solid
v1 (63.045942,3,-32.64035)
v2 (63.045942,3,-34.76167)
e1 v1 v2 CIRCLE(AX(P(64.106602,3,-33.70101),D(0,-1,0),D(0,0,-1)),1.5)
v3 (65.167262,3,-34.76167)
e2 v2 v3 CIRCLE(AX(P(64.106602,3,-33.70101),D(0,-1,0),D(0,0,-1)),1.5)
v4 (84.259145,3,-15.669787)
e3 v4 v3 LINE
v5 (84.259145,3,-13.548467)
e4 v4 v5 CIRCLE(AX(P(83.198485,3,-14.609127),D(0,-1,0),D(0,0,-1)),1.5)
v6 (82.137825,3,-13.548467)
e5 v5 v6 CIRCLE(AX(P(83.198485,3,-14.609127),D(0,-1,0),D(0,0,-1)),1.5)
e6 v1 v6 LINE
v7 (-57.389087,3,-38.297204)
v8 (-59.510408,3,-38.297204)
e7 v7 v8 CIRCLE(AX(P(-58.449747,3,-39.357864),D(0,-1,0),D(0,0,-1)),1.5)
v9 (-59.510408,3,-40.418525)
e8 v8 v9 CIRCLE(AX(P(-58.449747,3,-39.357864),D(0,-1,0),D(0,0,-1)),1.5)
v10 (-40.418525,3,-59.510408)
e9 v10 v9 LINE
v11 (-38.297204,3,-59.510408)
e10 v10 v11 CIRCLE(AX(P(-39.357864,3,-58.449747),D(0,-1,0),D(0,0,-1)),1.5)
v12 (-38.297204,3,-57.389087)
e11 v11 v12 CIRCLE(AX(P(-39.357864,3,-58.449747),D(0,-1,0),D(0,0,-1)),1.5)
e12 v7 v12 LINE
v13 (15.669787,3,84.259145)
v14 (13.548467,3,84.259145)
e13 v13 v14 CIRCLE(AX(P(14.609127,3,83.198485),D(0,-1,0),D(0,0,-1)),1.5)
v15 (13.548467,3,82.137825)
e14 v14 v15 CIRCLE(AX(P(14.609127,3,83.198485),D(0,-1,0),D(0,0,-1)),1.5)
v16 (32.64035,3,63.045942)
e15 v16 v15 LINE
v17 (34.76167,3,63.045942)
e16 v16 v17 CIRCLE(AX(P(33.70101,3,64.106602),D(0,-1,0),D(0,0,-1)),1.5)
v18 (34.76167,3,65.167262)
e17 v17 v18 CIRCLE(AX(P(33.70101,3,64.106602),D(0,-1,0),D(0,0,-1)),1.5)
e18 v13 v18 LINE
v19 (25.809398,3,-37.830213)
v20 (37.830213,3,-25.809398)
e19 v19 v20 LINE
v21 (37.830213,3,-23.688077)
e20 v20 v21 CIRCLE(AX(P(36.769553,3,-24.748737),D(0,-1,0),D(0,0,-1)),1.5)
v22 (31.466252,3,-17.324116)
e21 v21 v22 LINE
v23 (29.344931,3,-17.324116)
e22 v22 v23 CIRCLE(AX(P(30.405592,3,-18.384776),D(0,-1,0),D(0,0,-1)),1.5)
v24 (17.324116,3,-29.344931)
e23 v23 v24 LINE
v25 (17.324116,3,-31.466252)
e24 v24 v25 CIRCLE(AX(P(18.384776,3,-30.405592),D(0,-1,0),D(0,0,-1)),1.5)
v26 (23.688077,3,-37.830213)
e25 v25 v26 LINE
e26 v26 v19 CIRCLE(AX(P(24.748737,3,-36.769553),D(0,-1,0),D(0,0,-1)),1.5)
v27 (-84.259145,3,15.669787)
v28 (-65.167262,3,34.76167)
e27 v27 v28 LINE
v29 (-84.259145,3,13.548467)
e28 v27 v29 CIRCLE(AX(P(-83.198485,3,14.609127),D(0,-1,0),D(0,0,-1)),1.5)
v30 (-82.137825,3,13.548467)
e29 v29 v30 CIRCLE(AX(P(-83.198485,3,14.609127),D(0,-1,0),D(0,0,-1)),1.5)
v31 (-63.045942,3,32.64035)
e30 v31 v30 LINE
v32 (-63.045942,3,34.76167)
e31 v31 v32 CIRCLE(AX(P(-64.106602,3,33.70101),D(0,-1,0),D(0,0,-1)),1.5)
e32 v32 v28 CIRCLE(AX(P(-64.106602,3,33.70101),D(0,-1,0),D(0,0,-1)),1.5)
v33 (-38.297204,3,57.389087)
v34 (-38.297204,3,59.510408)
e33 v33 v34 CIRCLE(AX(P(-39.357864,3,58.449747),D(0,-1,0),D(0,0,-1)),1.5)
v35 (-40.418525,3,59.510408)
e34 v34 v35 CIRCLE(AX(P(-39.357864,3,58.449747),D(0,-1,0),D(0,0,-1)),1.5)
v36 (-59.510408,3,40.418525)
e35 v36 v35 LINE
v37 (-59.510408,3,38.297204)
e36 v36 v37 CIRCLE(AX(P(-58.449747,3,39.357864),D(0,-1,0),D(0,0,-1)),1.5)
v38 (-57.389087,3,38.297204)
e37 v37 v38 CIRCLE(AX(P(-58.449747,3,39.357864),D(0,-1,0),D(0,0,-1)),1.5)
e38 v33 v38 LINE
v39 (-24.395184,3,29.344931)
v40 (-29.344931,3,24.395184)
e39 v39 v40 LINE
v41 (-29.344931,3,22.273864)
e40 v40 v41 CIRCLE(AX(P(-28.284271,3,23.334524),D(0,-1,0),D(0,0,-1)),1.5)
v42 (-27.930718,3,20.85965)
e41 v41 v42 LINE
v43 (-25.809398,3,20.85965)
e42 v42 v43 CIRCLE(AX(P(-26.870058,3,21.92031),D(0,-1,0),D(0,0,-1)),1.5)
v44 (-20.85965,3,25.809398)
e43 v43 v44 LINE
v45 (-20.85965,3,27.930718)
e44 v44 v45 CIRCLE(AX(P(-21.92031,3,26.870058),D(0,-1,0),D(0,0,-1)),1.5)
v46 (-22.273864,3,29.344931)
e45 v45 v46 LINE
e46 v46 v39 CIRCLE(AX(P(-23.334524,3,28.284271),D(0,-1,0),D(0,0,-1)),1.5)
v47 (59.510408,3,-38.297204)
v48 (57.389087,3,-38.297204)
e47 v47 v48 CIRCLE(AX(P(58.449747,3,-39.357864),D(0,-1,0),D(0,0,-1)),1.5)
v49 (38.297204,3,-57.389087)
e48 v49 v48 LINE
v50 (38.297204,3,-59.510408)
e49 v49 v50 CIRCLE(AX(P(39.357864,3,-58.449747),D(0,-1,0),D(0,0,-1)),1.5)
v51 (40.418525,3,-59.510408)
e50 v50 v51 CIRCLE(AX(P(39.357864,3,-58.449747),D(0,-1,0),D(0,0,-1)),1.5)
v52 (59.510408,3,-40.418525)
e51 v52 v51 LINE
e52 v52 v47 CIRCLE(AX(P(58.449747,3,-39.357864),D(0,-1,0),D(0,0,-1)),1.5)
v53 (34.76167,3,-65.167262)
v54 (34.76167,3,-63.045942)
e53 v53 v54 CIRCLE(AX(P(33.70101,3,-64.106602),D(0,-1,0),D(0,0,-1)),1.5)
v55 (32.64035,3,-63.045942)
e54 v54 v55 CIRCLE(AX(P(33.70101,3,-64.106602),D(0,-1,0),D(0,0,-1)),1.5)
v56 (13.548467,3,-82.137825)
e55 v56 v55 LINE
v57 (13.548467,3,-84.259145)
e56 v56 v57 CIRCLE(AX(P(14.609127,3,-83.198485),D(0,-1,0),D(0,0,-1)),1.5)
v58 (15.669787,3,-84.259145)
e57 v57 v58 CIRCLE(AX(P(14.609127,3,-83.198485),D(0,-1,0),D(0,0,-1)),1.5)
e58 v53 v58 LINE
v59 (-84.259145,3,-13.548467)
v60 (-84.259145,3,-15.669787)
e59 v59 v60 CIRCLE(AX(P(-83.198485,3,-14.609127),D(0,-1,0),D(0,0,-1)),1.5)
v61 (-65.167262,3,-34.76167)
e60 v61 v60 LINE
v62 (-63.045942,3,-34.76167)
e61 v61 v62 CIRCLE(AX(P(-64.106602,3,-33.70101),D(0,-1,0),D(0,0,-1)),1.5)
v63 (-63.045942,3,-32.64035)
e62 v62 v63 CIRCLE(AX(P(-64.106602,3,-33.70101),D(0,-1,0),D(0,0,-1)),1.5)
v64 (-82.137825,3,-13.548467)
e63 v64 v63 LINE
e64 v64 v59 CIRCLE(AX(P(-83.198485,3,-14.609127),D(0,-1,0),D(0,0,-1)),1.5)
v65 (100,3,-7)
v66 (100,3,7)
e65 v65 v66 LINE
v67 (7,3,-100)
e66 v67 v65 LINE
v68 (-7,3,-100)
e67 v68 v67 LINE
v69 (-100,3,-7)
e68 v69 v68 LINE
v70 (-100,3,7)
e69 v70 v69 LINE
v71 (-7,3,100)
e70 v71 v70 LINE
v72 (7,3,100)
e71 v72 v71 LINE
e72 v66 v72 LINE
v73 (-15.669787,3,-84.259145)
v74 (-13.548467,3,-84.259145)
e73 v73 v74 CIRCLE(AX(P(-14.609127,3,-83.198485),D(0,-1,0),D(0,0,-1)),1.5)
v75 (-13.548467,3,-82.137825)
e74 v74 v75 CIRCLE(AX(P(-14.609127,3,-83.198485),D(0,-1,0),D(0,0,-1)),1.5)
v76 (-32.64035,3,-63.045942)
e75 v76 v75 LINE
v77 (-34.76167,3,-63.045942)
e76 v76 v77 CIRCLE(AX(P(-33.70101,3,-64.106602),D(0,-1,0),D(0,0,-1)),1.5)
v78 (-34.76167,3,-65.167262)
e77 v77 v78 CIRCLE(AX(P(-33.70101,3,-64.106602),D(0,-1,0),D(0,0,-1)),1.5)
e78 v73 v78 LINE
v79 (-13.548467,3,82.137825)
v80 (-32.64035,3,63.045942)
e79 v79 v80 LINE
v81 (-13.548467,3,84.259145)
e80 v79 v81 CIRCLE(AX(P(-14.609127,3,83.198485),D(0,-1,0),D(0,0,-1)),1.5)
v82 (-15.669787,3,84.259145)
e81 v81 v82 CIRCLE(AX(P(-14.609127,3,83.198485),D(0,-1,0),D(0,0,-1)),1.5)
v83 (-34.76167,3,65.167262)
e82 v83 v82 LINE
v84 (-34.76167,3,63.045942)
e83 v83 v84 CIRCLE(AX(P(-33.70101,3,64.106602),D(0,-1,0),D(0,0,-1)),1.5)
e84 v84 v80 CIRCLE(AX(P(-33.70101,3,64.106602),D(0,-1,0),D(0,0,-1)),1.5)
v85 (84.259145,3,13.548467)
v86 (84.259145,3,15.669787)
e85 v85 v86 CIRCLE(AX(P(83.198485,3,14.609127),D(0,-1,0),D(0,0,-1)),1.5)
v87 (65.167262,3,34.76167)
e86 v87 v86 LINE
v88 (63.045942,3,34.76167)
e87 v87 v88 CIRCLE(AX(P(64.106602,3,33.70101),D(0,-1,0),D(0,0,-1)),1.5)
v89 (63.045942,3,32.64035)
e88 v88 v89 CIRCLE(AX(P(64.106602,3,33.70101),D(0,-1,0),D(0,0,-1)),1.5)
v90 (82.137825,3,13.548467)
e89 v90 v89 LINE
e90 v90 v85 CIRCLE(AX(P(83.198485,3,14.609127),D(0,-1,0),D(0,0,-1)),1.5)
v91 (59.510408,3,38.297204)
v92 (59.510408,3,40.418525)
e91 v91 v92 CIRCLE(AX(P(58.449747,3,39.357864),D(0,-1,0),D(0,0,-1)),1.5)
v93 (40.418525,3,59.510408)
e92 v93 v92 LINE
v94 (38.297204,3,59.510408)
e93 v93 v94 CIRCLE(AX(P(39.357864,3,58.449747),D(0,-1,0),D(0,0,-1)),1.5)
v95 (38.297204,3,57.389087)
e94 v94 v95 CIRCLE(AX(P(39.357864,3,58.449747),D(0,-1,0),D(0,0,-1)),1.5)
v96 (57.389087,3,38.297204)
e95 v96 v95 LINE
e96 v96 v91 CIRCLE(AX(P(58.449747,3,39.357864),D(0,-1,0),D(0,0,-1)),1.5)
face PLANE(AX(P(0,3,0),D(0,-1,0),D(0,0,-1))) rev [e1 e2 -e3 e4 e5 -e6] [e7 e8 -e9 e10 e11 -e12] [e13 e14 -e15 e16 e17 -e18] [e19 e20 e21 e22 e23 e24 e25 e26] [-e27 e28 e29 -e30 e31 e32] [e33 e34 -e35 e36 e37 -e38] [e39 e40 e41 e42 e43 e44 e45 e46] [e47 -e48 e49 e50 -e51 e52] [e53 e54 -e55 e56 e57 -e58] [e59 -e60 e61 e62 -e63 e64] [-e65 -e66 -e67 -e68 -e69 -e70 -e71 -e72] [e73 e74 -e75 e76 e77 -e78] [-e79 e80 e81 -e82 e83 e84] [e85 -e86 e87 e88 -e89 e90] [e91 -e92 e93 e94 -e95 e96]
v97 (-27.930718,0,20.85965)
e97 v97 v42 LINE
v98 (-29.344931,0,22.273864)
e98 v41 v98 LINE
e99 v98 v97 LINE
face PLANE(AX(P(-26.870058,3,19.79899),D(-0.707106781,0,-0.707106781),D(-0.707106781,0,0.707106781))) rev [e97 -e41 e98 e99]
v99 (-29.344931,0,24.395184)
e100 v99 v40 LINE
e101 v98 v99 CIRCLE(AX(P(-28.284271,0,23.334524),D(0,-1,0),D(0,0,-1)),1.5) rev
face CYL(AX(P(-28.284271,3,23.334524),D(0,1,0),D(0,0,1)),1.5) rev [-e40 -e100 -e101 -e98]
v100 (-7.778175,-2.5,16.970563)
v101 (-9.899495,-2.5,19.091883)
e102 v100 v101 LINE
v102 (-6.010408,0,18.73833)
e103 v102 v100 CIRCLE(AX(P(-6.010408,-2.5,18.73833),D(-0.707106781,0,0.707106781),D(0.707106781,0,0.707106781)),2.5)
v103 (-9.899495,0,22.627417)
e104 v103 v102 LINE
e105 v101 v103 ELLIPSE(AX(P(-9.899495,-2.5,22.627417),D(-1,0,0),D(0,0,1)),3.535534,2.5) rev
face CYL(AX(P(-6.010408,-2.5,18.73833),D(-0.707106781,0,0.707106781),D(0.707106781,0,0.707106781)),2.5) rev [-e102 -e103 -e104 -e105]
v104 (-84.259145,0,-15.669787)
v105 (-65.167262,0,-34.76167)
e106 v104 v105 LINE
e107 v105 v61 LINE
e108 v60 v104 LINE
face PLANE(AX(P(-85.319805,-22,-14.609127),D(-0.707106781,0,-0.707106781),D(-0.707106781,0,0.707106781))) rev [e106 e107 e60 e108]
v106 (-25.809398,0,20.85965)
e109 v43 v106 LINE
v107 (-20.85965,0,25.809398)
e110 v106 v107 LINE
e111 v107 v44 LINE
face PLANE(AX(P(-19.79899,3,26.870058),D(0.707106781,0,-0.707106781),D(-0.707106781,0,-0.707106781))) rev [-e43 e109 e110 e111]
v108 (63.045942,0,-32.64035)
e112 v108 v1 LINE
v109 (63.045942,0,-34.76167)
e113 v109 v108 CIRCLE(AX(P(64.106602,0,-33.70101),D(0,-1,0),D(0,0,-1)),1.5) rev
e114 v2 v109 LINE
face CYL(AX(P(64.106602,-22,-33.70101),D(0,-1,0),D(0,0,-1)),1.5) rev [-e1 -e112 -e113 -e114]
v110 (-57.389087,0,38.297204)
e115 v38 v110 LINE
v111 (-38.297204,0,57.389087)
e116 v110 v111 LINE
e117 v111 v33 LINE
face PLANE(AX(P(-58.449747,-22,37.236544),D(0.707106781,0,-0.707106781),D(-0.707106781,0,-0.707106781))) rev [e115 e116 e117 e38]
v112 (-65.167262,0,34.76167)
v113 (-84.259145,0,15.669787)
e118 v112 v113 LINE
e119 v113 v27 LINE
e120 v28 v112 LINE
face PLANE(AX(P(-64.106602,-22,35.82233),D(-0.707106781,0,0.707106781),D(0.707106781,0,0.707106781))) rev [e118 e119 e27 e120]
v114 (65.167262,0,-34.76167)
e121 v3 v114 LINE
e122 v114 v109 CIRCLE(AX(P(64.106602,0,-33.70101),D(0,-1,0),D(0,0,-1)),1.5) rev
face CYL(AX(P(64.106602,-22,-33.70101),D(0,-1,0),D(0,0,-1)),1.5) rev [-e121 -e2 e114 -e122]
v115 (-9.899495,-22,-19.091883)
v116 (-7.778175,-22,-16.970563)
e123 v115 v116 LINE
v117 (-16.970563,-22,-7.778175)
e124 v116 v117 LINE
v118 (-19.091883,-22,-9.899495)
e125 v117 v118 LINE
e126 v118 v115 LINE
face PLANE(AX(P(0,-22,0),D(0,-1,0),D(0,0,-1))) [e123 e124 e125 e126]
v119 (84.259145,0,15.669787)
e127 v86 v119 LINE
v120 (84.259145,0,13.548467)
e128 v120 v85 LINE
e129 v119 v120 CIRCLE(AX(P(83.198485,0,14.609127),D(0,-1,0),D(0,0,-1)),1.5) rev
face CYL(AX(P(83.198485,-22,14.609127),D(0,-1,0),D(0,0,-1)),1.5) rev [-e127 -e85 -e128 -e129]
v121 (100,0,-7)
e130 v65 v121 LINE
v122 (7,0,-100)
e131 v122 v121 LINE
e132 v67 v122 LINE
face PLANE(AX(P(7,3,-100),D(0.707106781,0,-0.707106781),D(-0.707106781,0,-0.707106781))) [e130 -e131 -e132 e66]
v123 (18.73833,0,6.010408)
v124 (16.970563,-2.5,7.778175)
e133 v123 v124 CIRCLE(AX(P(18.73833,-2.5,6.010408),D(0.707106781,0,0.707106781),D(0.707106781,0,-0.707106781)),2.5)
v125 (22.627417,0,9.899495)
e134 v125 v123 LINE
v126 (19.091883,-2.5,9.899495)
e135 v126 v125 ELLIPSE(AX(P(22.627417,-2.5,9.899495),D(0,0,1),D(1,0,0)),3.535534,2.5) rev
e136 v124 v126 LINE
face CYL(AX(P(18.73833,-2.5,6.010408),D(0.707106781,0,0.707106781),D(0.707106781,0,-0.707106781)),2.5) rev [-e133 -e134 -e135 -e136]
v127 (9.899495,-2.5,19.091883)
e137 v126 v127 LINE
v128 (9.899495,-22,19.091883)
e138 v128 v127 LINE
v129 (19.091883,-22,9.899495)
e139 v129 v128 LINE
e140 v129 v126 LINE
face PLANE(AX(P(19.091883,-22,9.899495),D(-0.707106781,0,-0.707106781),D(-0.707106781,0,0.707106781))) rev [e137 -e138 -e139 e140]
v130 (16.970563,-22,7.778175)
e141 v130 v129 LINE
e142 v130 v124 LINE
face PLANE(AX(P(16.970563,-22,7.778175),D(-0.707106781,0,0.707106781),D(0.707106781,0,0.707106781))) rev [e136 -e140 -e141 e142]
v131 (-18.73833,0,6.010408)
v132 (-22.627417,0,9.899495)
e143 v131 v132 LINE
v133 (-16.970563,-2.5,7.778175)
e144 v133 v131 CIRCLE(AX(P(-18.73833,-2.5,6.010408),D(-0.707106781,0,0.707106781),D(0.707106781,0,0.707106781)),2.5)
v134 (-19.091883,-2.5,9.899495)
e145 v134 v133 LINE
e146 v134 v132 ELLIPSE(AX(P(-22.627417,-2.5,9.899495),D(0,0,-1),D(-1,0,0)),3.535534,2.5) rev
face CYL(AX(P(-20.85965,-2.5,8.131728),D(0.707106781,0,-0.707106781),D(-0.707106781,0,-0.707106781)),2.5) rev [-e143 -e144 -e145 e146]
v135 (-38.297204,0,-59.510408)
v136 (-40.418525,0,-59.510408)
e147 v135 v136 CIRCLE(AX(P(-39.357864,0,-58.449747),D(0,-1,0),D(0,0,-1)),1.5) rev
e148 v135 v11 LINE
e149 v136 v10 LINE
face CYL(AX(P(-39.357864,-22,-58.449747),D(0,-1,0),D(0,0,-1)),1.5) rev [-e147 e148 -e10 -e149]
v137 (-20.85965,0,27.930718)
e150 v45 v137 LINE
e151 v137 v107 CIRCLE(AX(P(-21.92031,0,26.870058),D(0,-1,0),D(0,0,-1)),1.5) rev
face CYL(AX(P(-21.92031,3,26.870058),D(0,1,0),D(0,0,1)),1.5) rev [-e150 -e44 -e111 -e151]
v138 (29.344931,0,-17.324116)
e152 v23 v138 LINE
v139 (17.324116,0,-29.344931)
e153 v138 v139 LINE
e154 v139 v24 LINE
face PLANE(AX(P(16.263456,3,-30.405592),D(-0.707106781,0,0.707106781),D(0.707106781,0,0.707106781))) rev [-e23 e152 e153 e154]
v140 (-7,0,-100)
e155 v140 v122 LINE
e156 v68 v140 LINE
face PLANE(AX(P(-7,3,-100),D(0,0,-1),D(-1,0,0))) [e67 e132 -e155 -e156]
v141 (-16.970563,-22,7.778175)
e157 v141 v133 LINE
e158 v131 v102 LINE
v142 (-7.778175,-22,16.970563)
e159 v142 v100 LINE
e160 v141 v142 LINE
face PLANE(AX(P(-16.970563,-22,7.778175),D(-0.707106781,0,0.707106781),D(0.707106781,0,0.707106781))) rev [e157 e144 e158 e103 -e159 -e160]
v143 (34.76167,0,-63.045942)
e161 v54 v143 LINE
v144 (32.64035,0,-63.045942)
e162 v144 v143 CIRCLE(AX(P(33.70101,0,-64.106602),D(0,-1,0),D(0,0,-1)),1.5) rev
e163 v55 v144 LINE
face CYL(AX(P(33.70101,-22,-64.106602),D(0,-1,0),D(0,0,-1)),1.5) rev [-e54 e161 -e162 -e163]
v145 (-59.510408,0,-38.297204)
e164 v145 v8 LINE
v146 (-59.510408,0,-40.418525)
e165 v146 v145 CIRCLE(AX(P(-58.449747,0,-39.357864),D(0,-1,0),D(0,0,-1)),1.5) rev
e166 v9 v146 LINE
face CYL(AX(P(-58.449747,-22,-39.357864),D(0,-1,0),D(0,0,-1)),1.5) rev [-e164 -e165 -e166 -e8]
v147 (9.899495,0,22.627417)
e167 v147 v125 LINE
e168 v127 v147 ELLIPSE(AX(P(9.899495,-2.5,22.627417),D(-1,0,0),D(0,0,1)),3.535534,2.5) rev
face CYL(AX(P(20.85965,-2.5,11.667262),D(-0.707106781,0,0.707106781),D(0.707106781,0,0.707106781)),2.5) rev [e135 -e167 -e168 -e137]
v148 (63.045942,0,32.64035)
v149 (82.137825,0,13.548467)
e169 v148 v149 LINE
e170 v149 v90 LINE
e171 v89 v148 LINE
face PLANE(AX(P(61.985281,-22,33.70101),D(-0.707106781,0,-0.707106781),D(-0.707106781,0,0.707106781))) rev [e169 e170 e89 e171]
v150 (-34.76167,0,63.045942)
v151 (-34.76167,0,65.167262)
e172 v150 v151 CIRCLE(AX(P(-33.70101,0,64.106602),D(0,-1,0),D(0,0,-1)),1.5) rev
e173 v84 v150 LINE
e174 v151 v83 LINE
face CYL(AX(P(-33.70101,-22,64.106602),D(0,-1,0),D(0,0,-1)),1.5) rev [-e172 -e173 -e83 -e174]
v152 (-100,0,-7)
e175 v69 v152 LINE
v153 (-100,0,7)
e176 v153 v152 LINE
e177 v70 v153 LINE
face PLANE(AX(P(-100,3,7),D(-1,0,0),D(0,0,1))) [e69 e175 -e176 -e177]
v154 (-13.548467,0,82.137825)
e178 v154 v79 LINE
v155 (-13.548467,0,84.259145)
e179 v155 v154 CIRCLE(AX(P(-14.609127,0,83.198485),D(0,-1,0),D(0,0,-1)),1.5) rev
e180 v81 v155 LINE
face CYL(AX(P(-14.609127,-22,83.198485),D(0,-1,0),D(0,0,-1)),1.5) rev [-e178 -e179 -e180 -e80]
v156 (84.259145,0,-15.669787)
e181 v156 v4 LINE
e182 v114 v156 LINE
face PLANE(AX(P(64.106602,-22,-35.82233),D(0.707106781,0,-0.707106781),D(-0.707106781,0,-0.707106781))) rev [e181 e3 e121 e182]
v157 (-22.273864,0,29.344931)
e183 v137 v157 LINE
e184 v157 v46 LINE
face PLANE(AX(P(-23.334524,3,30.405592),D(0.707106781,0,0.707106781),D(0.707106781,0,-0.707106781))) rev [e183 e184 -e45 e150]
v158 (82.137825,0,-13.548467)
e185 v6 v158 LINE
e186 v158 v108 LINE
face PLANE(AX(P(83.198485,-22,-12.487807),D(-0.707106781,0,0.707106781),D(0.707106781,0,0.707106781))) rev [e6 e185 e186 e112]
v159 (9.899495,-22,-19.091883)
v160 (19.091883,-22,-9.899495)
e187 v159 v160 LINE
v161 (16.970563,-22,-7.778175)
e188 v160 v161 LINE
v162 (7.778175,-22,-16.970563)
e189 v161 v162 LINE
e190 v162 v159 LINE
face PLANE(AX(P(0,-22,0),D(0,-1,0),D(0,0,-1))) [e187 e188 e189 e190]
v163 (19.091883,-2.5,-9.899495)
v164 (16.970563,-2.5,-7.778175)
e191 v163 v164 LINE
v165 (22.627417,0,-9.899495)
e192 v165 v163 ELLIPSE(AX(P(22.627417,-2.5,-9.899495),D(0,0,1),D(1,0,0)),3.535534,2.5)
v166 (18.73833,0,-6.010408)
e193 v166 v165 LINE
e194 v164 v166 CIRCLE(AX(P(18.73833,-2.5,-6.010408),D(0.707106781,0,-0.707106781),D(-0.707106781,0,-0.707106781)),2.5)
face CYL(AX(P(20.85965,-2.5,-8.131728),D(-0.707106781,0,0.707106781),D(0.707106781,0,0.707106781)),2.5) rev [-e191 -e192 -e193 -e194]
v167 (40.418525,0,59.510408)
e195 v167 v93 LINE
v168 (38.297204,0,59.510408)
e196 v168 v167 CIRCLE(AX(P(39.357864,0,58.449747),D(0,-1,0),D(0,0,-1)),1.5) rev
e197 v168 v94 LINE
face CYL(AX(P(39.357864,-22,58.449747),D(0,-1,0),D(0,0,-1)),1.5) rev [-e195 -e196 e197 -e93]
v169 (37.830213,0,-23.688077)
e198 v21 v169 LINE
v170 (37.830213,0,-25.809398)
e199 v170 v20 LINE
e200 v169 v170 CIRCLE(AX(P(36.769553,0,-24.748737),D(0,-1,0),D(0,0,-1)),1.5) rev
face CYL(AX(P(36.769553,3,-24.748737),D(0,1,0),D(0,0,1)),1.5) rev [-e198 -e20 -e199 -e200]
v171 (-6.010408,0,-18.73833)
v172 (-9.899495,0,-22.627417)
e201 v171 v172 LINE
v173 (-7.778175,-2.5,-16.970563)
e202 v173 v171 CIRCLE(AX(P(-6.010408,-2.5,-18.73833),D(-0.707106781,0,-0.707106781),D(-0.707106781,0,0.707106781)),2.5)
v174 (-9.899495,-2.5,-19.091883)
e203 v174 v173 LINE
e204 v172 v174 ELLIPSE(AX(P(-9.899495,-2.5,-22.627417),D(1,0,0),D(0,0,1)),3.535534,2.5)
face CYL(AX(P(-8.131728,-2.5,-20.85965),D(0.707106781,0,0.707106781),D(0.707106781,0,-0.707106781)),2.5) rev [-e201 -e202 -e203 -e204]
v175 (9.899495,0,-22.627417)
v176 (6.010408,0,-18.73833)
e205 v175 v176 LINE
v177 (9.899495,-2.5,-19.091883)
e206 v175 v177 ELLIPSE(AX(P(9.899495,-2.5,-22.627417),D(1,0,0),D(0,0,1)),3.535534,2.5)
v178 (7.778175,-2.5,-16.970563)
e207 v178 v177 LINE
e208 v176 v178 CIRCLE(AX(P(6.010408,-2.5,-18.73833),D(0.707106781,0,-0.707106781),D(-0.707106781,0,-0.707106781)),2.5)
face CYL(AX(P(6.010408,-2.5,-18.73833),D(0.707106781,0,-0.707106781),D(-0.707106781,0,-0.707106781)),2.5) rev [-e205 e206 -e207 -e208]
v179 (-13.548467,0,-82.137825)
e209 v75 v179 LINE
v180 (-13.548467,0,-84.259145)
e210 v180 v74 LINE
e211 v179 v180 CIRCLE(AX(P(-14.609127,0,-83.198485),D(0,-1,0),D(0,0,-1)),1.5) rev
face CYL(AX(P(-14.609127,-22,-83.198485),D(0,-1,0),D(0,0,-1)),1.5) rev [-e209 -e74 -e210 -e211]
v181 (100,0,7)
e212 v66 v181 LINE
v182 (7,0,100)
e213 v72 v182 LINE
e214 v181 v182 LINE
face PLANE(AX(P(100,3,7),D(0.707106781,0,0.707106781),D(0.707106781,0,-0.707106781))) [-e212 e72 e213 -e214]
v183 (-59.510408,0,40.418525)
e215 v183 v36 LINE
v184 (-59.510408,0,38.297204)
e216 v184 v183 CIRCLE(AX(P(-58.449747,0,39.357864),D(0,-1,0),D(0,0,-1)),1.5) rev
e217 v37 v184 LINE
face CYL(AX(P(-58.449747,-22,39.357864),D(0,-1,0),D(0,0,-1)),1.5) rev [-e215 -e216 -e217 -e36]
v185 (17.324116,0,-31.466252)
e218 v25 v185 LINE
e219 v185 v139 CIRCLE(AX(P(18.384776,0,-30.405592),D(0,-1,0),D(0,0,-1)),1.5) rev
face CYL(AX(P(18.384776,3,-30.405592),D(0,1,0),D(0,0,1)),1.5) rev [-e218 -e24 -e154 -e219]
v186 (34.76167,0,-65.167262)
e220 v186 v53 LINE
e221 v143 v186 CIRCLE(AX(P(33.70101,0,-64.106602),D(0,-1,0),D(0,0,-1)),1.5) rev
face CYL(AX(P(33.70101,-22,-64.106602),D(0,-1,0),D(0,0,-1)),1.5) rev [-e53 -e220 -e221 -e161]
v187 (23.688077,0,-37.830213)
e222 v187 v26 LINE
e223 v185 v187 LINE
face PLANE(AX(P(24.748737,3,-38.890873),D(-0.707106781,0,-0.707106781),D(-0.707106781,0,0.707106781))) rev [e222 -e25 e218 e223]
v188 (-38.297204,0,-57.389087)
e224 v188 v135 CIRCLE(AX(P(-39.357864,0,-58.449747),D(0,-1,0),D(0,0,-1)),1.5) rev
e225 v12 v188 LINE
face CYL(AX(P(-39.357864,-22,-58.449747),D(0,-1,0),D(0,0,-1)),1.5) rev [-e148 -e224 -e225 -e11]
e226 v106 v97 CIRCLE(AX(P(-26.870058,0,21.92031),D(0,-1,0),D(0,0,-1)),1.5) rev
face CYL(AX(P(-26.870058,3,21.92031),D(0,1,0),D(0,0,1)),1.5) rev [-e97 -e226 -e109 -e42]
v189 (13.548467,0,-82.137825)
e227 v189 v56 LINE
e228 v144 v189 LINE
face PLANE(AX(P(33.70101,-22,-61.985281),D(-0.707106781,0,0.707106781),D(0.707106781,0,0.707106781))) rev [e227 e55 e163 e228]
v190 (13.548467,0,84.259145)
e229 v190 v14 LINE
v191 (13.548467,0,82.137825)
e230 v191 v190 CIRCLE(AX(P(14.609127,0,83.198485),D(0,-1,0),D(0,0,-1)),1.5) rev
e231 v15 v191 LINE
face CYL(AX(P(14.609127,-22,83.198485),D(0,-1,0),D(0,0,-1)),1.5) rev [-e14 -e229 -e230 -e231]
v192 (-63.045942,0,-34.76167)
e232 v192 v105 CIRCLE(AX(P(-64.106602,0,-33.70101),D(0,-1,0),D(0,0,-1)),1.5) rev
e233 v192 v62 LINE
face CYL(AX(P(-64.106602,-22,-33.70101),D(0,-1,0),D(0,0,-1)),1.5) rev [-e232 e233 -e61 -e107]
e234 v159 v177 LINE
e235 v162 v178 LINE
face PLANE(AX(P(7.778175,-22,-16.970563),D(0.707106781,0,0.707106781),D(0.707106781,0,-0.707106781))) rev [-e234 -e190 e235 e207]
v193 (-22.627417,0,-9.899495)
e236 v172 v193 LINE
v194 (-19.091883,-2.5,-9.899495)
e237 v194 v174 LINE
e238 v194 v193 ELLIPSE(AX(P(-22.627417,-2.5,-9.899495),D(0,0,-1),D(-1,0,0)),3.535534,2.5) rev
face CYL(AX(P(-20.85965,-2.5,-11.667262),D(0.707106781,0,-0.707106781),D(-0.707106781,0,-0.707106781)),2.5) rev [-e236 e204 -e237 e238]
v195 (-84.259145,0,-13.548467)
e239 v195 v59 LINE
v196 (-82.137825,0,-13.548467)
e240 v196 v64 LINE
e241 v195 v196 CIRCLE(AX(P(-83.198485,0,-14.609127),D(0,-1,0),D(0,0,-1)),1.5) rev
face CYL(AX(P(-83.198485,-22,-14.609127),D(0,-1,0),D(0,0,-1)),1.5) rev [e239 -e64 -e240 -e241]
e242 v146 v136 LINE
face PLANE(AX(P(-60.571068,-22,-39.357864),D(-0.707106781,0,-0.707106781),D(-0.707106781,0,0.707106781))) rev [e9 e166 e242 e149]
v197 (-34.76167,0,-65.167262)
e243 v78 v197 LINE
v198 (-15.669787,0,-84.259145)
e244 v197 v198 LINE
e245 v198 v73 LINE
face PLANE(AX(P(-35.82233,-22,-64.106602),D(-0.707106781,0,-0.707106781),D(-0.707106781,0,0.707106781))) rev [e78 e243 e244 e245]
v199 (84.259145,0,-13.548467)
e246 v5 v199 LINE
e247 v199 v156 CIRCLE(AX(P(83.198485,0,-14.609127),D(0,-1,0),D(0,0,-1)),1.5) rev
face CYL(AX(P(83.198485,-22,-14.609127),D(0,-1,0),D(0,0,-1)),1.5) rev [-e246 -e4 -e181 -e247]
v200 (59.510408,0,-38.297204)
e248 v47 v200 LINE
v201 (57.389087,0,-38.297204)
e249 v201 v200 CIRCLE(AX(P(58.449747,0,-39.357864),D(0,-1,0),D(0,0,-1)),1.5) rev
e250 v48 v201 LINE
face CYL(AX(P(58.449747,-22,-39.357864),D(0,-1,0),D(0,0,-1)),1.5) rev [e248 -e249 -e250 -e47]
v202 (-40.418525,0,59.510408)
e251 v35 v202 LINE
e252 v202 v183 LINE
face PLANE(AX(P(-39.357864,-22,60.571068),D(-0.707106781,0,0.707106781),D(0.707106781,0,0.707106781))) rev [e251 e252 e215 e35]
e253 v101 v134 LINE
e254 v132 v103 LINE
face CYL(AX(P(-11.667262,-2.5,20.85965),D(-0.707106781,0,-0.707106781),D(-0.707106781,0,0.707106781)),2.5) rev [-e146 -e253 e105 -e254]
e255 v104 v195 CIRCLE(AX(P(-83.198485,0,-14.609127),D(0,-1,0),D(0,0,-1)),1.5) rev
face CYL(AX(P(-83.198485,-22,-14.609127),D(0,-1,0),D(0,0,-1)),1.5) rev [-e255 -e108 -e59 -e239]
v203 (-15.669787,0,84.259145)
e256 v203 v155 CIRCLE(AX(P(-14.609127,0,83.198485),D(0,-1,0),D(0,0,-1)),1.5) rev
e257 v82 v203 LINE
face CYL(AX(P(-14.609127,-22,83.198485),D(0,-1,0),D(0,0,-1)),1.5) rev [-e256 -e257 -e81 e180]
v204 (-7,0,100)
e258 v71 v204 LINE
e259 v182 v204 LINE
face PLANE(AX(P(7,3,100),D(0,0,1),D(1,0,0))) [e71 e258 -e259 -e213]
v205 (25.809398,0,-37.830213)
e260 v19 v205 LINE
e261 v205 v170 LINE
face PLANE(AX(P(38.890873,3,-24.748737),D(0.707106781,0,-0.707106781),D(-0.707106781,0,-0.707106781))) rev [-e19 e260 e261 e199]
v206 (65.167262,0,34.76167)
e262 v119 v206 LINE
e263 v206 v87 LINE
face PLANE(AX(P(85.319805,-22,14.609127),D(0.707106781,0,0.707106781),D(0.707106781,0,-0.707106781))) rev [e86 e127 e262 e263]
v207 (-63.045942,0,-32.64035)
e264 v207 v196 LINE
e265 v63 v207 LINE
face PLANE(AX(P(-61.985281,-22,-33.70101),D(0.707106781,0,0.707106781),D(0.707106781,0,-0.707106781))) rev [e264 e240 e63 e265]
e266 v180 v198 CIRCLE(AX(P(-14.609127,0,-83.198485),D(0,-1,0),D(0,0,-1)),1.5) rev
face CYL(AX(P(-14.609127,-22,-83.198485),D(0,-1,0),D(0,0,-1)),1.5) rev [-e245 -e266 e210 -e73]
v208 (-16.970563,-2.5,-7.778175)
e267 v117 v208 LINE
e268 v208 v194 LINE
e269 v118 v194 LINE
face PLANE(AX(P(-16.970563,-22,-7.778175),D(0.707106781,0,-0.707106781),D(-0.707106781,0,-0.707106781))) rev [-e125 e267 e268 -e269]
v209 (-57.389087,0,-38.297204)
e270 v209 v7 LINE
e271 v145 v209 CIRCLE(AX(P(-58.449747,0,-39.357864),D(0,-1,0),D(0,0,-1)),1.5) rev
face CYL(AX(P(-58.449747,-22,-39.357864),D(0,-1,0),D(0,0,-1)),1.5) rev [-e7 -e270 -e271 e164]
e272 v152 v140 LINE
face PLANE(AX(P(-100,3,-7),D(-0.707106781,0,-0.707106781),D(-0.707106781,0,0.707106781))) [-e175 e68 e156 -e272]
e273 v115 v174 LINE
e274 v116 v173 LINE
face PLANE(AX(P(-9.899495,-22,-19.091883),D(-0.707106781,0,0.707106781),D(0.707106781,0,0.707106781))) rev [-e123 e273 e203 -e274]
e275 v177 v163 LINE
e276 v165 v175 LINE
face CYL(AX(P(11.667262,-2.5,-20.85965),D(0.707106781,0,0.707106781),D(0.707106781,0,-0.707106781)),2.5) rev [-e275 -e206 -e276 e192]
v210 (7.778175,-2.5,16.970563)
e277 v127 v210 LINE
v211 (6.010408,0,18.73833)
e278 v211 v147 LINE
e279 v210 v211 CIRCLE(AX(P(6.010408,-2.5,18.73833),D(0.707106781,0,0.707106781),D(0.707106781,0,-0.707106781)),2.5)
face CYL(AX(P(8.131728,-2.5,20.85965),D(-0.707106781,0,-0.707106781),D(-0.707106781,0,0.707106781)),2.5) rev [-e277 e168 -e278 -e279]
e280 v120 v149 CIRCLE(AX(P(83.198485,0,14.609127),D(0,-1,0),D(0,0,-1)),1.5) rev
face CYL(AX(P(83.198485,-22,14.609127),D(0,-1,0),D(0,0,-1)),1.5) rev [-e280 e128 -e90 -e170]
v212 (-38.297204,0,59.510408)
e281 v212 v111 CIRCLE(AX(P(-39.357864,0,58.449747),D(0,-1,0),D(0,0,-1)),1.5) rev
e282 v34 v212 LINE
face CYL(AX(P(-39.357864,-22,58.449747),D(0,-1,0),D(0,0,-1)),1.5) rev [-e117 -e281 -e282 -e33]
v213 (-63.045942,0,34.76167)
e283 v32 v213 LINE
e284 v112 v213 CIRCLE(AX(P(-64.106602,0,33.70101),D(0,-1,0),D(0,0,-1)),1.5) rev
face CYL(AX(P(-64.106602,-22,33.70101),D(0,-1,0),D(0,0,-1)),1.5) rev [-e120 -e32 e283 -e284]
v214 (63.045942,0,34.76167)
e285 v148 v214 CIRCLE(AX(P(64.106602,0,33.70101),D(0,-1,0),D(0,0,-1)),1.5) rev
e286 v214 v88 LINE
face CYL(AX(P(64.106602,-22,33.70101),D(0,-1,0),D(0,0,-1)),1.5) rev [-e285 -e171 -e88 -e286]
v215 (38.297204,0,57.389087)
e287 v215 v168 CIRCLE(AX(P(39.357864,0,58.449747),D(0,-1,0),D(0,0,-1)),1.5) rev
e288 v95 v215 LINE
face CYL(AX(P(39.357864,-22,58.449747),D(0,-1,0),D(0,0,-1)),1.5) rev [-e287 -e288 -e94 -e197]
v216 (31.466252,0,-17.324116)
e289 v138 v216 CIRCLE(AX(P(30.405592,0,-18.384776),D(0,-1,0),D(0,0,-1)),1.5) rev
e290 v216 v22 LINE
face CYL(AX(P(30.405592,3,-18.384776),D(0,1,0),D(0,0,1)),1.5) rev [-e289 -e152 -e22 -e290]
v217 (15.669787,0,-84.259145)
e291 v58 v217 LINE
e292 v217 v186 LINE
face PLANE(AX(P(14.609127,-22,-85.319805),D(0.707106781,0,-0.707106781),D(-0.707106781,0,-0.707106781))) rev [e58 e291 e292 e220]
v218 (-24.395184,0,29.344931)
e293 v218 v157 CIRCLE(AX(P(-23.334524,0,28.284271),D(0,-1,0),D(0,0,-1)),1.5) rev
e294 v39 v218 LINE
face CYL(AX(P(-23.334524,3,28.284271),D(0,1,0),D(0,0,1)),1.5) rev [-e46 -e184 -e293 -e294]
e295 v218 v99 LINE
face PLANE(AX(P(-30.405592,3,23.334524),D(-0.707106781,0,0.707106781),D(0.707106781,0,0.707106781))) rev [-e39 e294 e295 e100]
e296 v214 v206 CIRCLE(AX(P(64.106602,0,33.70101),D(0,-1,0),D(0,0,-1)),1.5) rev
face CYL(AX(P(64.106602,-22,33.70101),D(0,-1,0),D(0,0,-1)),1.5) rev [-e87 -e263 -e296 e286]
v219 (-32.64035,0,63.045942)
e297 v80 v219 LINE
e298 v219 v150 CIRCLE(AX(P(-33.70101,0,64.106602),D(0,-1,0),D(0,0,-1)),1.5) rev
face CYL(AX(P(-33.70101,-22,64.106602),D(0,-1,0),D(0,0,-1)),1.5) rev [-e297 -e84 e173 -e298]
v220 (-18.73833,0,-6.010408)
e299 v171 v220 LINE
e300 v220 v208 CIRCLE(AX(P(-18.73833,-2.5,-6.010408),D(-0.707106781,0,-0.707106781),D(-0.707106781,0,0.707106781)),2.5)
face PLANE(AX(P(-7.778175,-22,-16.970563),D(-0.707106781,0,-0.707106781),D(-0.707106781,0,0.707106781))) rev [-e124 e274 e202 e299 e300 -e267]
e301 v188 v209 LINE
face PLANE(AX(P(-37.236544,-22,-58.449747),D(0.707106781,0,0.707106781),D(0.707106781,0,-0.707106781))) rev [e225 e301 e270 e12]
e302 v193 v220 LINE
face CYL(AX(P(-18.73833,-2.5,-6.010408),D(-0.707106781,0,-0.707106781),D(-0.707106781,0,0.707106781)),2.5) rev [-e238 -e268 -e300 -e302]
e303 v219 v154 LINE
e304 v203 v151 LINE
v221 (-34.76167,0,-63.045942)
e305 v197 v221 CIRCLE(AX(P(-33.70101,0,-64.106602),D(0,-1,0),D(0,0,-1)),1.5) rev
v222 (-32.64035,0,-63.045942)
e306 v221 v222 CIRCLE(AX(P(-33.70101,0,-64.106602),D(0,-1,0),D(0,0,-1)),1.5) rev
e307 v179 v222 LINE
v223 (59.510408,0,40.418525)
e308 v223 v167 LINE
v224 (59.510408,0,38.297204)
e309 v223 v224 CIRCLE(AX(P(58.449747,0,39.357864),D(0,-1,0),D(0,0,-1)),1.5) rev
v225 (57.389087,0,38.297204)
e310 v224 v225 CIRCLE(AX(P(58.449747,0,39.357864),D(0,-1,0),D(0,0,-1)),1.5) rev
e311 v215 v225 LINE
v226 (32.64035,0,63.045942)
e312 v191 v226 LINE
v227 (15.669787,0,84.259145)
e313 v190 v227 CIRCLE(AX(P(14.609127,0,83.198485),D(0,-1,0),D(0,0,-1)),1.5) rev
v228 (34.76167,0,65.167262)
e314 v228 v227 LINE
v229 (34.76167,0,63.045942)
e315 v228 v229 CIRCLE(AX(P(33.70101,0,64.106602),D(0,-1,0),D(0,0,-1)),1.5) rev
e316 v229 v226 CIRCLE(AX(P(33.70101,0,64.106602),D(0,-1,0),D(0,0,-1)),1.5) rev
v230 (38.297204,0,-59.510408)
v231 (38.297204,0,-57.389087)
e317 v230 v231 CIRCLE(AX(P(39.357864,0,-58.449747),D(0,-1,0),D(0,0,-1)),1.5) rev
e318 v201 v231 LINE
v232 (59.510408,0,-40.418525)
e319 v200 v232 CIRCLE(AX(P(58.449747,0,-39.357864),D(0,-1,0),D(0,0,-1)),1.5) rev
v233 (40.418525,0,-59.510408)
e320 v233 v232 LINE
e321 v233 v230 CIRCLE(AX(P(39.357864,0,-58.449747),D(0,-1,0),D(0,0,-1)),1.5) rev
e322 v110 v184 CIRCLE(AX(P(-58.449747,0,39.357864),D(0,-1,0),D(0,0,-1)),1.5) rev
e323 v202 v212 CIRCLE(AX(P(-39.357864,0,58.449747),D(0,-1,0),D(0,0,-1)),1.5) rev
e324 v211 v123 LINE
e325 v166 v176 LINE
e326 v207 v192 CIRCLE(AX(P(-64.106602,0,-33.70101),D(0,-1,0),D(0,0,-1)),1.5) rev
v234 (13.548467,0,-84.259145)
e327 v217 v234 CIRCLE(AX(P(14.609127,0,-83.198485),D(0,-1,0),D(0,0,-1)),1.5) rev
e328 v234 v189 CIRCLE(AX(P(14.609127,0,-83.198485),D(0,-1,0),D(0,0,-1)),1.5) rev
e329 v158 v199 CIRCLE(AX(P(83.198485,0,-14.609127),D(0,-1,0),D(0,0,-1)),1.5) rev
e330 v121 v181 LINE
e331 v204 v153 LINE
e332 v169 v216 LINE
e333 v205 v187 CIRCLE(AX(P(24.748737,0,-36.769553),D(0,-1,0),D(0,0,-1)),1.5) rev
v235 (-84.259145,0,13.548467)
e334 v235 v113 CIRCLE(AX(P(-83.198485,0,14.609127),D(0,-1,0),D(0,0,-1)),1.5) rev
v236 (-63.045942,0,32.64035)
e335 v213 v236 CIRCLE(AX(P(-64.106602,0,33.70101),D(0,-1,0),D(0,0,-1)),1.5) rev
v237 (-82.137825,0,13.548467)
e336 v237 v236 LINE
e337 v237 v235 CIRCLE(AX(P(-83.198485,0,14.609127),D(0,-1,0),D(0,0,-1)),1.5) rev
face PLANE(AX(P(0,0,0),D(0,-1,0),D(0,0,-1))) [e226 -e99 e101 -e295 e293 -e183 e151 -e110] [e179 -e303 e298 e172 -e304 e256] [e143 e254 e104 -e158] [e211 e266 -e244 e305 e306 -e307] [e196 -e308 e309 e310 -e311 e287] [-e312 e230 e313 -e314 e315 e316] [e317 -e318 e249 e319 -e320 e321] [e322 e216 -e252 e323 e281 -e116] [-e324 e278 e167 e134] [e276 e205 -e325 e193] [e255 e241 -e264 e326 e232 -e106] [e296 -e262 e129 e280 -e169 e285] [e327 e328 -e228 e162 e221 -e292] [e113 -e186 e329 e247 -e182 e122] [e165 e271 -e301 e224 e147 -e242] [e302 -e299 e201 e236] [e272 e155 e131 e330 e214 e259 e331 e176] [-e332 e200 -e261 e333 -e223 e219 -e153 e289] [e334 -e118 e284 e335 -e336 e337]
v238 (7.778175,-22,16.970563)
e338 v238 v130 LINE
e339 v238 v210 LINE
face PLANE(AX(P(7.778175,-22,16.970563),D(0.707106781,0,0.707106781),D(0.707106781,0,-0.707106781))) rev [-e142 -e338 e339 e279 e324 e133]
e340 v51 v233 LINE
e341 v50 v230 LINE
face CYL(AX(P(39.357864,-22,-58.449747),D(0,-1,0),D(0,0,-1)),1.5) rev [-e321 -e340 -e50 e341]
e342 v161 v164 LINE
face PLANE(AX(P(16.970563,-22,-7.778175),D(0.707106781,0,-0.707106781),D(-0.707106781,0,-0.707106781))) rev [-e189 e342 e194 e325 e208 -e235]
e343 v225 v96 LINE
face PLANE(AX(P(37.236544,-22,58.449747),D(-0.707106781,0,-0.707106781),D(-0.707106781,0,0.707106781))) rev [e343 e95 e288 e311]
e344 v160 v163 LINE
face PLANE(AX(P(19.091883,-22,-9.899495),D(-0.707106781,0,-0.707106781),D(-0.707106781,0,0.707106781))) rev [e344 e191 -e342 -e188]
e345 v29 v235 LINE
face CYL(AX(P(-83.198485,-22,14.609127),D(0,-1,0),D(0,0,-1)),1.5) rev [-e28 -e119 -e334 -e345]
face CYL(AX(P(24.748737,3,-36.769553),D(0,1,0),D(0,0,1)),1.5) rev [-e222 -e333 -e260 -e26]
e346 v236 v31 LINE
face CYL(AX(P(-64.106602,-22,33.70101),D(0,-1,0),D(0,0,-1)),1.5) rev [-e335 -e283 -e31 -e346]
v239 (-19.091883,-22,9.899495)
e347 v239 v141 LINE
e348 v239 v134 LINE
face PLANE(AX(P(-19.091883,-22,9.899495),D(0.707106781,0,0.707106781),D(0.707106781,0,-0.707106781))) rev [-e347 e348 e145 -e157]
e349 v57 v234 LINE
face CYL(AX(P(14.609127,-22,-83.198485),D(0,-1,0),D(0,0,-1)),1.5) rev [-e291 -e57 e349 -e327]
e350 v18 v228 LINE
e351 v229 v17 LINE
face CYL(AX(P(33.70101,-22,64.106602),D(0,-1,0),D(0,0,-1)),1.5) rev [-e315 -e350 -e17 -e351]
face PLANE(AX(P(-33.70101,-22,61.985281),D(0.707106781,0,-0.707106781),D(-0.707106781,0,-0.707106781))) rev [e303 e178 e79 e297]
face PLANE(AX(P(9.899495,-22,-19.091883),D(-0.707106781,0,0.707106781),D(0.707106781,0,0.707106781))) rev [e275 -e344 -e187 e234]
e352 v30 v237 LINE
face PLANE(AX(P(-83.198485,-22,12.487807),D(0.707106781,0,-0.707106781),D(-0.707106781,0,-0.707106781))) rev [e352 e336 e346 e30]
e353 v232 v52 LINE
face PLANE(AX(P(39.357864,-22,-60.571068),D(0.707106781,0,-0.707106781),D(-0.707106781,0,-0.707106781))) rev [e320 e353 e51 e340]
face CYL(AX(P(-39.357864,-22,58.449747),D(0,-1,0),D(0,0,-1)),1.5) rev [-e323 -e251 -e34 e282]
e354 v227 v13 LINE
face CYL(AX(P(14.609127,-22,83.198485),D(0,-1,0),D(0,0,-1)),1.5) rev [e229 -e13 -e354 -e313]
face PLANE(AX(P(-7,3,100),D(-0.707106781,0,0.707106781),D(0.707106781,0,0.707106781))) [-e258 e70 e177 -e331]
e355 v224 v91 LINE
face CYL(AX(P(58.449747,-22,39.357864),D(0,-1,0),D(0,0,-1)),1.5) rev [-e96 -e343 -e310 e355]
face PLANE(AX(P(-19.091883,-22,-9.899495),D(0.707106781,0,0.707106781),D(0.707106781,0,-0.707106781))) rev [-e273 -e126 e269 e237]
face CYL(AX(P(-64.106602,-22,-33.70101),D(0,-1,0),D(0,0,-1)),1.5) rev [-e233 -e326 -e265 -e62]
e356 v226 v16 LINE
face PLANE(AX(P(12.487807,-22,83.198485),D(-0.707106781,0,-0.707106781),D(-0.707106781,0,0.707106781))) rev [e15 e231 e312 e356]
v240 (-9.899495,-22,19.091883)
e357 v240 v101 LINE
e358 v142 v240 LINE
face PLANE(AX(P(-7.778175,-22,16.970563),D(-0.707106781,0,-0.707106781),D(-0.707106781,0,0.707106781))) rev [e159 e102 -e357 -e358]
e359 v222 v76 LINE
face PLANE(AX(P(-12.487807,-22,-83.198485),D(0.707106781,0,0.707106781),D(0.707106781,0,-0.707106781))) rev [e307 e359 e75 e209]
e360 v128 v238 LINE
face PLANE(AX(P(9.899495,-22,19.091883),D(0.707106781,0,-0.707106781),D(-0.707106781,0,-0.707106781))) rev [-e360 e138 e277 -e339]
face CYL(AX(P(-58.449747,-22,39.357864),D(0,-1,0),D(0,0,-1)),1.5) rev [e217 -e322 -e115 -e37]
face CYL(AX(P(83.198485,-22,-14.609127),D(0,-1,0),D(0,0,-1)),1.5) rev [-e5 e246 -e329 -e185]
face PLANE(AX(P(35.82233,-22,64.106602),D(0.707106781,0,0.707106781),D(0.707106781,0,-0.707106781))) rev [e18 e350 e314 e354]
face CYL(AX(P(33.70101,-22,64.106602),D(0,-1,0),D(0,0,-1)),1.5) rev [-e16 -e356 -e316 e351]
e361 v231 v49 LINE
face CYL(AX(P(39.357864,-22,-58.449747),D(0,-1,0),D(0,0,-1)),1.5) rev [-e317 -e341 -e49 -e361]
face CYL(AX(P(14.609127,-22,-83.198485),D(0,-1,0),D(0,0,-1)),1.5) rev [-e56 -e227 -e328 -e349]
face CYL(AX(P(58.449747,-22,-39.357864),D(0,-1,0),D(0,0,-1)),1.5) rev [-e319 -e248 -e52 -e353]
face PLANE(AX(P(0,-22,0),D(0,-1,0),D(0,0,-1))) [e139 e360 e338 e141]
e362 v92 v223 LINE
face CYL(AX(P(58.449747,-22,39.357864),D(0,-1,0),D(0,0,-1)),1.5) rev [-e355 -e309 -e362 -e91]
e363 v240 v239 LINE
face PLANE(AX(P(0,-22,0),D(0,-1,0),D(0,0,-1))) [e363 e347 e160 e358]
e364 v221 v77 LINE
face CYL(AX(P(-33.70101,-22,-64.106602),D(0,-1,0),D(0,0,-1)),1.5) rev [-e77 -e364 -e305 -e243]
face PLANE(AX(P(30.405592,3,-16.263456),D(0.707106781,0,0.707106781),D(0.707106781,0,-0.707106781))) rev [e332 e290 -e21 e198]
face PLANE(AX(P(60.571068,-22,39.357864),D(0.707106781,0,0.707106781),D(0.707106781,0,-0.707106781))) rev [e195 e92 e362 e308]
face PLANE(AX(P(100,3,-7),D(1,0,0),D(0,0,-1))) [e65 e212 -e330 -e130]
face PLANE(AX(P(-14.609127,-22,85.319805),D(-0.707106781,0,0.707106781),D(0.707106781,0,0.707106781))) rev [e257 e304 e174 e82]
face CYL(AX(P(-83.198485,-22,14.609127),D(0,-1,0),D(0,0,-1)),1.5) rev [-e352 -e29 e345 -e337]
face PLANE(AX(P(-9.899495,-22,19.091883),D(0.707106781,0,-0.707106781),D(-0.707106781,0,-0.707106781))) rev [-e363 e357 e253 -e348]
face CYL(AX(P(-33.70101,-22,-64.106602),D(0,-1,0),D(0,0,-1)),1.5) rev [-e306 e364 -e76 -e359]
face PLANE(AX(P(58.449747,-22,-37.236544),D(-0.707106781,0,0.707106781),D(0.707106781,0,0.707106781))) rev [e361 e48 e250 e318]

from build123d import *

# Parameters (mm, degrees)
MAIN_PLATE_DEPTH               = 3
BOTTOM_PLATE_CONNECTORS_DEPTH  = 22
REMOVE_STRESS_CONCENTRATIONS_R = 2.5
WIRE_HOLES_DEPTH               = 144.122325303
CUT_EXTRUDE1_DEPTH             = 144.614066163
FILLET1_R                      = 1.5


with BuildPart() as part:
    # Sketch1 → Main Plate (new body)
    with BuildSketch(Plane(origin=(0, 0, 0), x_dir=(1, 0, 0), z_dir=(0, 1, 0))):
        Polygon((-7, 100), (7, 100), (100, 7), (100, -7), (7, -100), (-7, -100), (-100, -7), (-100, 7), align=None)
    extrude(amount=MAIN_PLATE_DEPTH)

    # Sketch2 → Bottom Plate Connectors (add)
    with BuildSketch(Plane.XZ):
        Polygon((7.778174593, 16.970562748), (16.970562748, 7.778174593), (19.091883092, 9.899494937), (9.899494937, 19.091883092), align=None)
        Polygon((16.970562748, -7.778174593), (7.778174593, -16.970562748), (9.899494937, -19.091883092), (19.091883092, -9.899494937), align=None)
        Polygon((-7.778174593, -16.970562748), (-16.970562748, -7.778174593), (-19.091883092, -9.899494937), (-9.899494937, -19.091883092), align=None)
        Polygon((-16.970562748, 7.778174593), (-7.778174593, 16.970562748), (-9.899494937, 19.091883092), (-19.091883092, 9.899494937), align=None)
    extrude(amount=BOTTOM_PLATE_CONNECTORS_DEPTH)

    # Remove Stress Concentrations
    remove_stress_concentrations_edges = [part.edges().sort_by_distance(p)[0] for p in [
        (8.838834765, 0, 18.03122292),
        (18.03122292, 0, 8.838834765),
        (14.495689014, 0, 14.495689014),
        (18.03122292, 0, -8.838834765),
        (8.838834765, 0, -18.03122292),
        (14.495689014, 0, -14.495689014),
        (-8.838834765, 0, -18.03122292),
        (-18.03122292, 0, -8.838834765),
        (-14.495689014, 0, -14.495689014),
        (-18.03122292, 0, 8.838834765),
        (-8.838834765, 0, 18.03122292),
        (-14.495689014, 0, 14.495689014),
    ]]
    fillet(remove_stress_concentrations_edges, radius=REMOVE_STRESS_CONCENTRATIONS_R)

    # Sketch3 → Wire Holes (cut, through all)
    with BuildSketch(Plane.XZ):
        Polygon((30.405591591, -16.263455967), (38.890872965, -24.748737342), (24.748737342, -38.890872965), (16.263455967, -30.405591591), align=None)
        Polygon((-23.334523779, 30.405591591), (-19.798989873, 26.870057685), (-26.870057685, 19.798989873), (-30.405591591, 23.334523779), align=None)
    extrude(amount=-WIRE_HOLES_DEPTH, mode=Mode.SUBTRACT)

    # Sketch4 → Cut-Extrude1 (cut, through all)
    with BuildSketch(Plane(origin=(0, 3, 0), x_dir=(1, 0, 0), z_dir=(0, 1, 0))):
        Polygon((14.609127035, 85.319805153), (35.82233047, 64.106601718), (33.701010127, 61.985281374), (12.487806691, 83.19848481), align=None)
        Polygon((39.357864376, 60.571067812), (60.571067812, 39.357864376), (58.449747468, 37.236544033), (37.236544033, 58.449747468), align=None)
        Polygon((64.106601718, 35.82233047), (85.319805153, 14.609127035), (83.19848481, 12.487806691), (61.985281374, 33.701010127), align=None)
        Polygon((85.319805153, -14.609127035), (64.106601718, -35.82233047), (61.985281374, -33.701010127), (83.19848481, -12.487806691), align=None)
        Polygon((58.449747468, -37.236544033), (60.571067812, -39.357864376), (39.357864376, -60.571067812), (37.236544033, -58.449747468), align=None)
        Polygon((33.701010127, -61.985281374), (35.82233047, -64.106601718), (14.609127035, -85.319805153), (12.487806691, -83.19848481), align=None)
        Polygon((-14.609127035, -85.319805153), (-35.82233047, -64.106601718), (-33.701010127, -61.985281374), (-12.487806691, -83.19848481), align=None)
        Polygon((-37.236544033, -58.449747468), (-39.357864376, -60.571067812), (-60.571067812, -39.357864376), (-58.449747468, -37.236544033), align=None)
        Polygon((-61.985281374, -33.701010127), (-64.106601718, -35.82233047), (-85.319805153, -14.609127035), (-83.19848481, -12.487806691), align=None)
        Polygon((-85.319805153, 14.609127035), (-64.106601718, 35.82233047), (-61.985281374, 33.701010127), (-83.19848481, 12.487806691), align=None)
        Polygon((-58.449747468, 37.236544033), (-60.571067812, 39.357864376), (-39.357864376, 60.571067812), (-37.236544033, 58.449747468), align=None)
        Polygon((-33.701010127, 61.985281374), (-35.82233047, 64.106601718), (-14.609127035, 85.319805153), (-12.487806691, 83.19848481), align=None)
    extrude(amount=-CUT_EXTRUDE1_DEPTH, mode=Mode.SUBTRACT)

    # Fillet1
    fillet1_edges = [part.edges().sort_by_distance(p)[0] for p in [
        (16.263455967, 1.5, -30.405591591),
        (24.748737342, 1.5, -38.890872965),
        (30.405591591, 1.5, -16.263455967),
        (38.890872965, 1.5, -24.748737342),
        (-23.334523779, 1.5, 30.405591591),
        (-19.798989873, 1.5, 26.870057685),
        (-30.405591591, 1.5, 23.334523779),
        (-26.870057685, 1.5, 19.798989873),
        (-33.701010127, 1.5, 61.985281374),
        (-58.449747468, 1.5, 37.236544033),
        (-83.19848481, 1.5, 12.487806691),
        (-64.106601718, 1.5, -35.82233047),
        (-39.357864376, 1.5, -60.571067812),
        (-14.609127035, 1.5, -85.319805153),
        (14.609127035, 1.5, -85.319805153),
        (33.701010127, 1.5, 61.985281374),
        (58.449747468, 1.5, 37.236544033),
        (83.19848481, 1.5, 12.487806691),
        (39.357864376, 1.5, -60.571067812),
        (64.106601718, 1.5, -35.82233047),
        (-39.357864376, 1.5, 60.571067812),
        (-64.106601718, 1.5, 35.82233047),
        (-83.19848481, 1.5, -12.487806691),
        (-58.449747468, 1.5, -37.236544033),
        (-33.701010127, 1.5, -61.985281374),
        (33.701010127, 1.5, -61.985281374),
        (58.449747468, 1.5, -37.236544033),
        (83.19848481, 1.5, -12.487806691),
        (64.106601718, 1.5, 35.82233047),
        (-14.609127035, 1.5, 85.319805153),
        (39.357864376, 1.5, 60.571067812),
        (14.609127035, 1.5, 85.319805153),
        (-85.319805153, 1.5, 14.609127035),
        (-85.319805153, 1.5, -14.609127035),
        (-60.571067812, 1.5, -39.357864376),
        (-35.82233047, 1.5, -64.106601718),
        (-60.571067812, 1.5, 39.357864376),
        (-35.82233047, 1.5, 64.106601718),
        (12.487806691, 1.5, 83.19848481),
        (12.487806691, 1.5, -83.19848481),
        (-12.487806691, 1.5, 83.19848481),
        (-37.236544033, 1.5, 58.449747468),
        (-61.985281374, 1.5, 33.701010127),
        (-61.985281374, 1.5, -33.701010127),
        (-37.236544033, 1.5, -58.449747468),
        (-12.487806691, 1.5, -83.19848481),
        (35.82233047, 1.5, -64.106601718),
        (60.571067812, 1.5, -39.357864376),
        (85.319805153, 1.5, -14.609127035),
        (35.82233047, 1.5, 64.106601718),
        (60.571067812, 1.5, 39.357864376),
        (85.319805153, 1.5, 14.609127035),
        (37.236544033, 1.5, 58.449747468),
        (61.985281374, 1.5, 33.701010127),
        (37.236544033, 1.5, -58.449747468),
        (61.985281374, 1.5, -33.701010127),
    ]]
    fillet(fillet1_edges, radius=FILLET1_R - 0.0001)  # a hair under: the kernel refuses the full size


solid = part.part
